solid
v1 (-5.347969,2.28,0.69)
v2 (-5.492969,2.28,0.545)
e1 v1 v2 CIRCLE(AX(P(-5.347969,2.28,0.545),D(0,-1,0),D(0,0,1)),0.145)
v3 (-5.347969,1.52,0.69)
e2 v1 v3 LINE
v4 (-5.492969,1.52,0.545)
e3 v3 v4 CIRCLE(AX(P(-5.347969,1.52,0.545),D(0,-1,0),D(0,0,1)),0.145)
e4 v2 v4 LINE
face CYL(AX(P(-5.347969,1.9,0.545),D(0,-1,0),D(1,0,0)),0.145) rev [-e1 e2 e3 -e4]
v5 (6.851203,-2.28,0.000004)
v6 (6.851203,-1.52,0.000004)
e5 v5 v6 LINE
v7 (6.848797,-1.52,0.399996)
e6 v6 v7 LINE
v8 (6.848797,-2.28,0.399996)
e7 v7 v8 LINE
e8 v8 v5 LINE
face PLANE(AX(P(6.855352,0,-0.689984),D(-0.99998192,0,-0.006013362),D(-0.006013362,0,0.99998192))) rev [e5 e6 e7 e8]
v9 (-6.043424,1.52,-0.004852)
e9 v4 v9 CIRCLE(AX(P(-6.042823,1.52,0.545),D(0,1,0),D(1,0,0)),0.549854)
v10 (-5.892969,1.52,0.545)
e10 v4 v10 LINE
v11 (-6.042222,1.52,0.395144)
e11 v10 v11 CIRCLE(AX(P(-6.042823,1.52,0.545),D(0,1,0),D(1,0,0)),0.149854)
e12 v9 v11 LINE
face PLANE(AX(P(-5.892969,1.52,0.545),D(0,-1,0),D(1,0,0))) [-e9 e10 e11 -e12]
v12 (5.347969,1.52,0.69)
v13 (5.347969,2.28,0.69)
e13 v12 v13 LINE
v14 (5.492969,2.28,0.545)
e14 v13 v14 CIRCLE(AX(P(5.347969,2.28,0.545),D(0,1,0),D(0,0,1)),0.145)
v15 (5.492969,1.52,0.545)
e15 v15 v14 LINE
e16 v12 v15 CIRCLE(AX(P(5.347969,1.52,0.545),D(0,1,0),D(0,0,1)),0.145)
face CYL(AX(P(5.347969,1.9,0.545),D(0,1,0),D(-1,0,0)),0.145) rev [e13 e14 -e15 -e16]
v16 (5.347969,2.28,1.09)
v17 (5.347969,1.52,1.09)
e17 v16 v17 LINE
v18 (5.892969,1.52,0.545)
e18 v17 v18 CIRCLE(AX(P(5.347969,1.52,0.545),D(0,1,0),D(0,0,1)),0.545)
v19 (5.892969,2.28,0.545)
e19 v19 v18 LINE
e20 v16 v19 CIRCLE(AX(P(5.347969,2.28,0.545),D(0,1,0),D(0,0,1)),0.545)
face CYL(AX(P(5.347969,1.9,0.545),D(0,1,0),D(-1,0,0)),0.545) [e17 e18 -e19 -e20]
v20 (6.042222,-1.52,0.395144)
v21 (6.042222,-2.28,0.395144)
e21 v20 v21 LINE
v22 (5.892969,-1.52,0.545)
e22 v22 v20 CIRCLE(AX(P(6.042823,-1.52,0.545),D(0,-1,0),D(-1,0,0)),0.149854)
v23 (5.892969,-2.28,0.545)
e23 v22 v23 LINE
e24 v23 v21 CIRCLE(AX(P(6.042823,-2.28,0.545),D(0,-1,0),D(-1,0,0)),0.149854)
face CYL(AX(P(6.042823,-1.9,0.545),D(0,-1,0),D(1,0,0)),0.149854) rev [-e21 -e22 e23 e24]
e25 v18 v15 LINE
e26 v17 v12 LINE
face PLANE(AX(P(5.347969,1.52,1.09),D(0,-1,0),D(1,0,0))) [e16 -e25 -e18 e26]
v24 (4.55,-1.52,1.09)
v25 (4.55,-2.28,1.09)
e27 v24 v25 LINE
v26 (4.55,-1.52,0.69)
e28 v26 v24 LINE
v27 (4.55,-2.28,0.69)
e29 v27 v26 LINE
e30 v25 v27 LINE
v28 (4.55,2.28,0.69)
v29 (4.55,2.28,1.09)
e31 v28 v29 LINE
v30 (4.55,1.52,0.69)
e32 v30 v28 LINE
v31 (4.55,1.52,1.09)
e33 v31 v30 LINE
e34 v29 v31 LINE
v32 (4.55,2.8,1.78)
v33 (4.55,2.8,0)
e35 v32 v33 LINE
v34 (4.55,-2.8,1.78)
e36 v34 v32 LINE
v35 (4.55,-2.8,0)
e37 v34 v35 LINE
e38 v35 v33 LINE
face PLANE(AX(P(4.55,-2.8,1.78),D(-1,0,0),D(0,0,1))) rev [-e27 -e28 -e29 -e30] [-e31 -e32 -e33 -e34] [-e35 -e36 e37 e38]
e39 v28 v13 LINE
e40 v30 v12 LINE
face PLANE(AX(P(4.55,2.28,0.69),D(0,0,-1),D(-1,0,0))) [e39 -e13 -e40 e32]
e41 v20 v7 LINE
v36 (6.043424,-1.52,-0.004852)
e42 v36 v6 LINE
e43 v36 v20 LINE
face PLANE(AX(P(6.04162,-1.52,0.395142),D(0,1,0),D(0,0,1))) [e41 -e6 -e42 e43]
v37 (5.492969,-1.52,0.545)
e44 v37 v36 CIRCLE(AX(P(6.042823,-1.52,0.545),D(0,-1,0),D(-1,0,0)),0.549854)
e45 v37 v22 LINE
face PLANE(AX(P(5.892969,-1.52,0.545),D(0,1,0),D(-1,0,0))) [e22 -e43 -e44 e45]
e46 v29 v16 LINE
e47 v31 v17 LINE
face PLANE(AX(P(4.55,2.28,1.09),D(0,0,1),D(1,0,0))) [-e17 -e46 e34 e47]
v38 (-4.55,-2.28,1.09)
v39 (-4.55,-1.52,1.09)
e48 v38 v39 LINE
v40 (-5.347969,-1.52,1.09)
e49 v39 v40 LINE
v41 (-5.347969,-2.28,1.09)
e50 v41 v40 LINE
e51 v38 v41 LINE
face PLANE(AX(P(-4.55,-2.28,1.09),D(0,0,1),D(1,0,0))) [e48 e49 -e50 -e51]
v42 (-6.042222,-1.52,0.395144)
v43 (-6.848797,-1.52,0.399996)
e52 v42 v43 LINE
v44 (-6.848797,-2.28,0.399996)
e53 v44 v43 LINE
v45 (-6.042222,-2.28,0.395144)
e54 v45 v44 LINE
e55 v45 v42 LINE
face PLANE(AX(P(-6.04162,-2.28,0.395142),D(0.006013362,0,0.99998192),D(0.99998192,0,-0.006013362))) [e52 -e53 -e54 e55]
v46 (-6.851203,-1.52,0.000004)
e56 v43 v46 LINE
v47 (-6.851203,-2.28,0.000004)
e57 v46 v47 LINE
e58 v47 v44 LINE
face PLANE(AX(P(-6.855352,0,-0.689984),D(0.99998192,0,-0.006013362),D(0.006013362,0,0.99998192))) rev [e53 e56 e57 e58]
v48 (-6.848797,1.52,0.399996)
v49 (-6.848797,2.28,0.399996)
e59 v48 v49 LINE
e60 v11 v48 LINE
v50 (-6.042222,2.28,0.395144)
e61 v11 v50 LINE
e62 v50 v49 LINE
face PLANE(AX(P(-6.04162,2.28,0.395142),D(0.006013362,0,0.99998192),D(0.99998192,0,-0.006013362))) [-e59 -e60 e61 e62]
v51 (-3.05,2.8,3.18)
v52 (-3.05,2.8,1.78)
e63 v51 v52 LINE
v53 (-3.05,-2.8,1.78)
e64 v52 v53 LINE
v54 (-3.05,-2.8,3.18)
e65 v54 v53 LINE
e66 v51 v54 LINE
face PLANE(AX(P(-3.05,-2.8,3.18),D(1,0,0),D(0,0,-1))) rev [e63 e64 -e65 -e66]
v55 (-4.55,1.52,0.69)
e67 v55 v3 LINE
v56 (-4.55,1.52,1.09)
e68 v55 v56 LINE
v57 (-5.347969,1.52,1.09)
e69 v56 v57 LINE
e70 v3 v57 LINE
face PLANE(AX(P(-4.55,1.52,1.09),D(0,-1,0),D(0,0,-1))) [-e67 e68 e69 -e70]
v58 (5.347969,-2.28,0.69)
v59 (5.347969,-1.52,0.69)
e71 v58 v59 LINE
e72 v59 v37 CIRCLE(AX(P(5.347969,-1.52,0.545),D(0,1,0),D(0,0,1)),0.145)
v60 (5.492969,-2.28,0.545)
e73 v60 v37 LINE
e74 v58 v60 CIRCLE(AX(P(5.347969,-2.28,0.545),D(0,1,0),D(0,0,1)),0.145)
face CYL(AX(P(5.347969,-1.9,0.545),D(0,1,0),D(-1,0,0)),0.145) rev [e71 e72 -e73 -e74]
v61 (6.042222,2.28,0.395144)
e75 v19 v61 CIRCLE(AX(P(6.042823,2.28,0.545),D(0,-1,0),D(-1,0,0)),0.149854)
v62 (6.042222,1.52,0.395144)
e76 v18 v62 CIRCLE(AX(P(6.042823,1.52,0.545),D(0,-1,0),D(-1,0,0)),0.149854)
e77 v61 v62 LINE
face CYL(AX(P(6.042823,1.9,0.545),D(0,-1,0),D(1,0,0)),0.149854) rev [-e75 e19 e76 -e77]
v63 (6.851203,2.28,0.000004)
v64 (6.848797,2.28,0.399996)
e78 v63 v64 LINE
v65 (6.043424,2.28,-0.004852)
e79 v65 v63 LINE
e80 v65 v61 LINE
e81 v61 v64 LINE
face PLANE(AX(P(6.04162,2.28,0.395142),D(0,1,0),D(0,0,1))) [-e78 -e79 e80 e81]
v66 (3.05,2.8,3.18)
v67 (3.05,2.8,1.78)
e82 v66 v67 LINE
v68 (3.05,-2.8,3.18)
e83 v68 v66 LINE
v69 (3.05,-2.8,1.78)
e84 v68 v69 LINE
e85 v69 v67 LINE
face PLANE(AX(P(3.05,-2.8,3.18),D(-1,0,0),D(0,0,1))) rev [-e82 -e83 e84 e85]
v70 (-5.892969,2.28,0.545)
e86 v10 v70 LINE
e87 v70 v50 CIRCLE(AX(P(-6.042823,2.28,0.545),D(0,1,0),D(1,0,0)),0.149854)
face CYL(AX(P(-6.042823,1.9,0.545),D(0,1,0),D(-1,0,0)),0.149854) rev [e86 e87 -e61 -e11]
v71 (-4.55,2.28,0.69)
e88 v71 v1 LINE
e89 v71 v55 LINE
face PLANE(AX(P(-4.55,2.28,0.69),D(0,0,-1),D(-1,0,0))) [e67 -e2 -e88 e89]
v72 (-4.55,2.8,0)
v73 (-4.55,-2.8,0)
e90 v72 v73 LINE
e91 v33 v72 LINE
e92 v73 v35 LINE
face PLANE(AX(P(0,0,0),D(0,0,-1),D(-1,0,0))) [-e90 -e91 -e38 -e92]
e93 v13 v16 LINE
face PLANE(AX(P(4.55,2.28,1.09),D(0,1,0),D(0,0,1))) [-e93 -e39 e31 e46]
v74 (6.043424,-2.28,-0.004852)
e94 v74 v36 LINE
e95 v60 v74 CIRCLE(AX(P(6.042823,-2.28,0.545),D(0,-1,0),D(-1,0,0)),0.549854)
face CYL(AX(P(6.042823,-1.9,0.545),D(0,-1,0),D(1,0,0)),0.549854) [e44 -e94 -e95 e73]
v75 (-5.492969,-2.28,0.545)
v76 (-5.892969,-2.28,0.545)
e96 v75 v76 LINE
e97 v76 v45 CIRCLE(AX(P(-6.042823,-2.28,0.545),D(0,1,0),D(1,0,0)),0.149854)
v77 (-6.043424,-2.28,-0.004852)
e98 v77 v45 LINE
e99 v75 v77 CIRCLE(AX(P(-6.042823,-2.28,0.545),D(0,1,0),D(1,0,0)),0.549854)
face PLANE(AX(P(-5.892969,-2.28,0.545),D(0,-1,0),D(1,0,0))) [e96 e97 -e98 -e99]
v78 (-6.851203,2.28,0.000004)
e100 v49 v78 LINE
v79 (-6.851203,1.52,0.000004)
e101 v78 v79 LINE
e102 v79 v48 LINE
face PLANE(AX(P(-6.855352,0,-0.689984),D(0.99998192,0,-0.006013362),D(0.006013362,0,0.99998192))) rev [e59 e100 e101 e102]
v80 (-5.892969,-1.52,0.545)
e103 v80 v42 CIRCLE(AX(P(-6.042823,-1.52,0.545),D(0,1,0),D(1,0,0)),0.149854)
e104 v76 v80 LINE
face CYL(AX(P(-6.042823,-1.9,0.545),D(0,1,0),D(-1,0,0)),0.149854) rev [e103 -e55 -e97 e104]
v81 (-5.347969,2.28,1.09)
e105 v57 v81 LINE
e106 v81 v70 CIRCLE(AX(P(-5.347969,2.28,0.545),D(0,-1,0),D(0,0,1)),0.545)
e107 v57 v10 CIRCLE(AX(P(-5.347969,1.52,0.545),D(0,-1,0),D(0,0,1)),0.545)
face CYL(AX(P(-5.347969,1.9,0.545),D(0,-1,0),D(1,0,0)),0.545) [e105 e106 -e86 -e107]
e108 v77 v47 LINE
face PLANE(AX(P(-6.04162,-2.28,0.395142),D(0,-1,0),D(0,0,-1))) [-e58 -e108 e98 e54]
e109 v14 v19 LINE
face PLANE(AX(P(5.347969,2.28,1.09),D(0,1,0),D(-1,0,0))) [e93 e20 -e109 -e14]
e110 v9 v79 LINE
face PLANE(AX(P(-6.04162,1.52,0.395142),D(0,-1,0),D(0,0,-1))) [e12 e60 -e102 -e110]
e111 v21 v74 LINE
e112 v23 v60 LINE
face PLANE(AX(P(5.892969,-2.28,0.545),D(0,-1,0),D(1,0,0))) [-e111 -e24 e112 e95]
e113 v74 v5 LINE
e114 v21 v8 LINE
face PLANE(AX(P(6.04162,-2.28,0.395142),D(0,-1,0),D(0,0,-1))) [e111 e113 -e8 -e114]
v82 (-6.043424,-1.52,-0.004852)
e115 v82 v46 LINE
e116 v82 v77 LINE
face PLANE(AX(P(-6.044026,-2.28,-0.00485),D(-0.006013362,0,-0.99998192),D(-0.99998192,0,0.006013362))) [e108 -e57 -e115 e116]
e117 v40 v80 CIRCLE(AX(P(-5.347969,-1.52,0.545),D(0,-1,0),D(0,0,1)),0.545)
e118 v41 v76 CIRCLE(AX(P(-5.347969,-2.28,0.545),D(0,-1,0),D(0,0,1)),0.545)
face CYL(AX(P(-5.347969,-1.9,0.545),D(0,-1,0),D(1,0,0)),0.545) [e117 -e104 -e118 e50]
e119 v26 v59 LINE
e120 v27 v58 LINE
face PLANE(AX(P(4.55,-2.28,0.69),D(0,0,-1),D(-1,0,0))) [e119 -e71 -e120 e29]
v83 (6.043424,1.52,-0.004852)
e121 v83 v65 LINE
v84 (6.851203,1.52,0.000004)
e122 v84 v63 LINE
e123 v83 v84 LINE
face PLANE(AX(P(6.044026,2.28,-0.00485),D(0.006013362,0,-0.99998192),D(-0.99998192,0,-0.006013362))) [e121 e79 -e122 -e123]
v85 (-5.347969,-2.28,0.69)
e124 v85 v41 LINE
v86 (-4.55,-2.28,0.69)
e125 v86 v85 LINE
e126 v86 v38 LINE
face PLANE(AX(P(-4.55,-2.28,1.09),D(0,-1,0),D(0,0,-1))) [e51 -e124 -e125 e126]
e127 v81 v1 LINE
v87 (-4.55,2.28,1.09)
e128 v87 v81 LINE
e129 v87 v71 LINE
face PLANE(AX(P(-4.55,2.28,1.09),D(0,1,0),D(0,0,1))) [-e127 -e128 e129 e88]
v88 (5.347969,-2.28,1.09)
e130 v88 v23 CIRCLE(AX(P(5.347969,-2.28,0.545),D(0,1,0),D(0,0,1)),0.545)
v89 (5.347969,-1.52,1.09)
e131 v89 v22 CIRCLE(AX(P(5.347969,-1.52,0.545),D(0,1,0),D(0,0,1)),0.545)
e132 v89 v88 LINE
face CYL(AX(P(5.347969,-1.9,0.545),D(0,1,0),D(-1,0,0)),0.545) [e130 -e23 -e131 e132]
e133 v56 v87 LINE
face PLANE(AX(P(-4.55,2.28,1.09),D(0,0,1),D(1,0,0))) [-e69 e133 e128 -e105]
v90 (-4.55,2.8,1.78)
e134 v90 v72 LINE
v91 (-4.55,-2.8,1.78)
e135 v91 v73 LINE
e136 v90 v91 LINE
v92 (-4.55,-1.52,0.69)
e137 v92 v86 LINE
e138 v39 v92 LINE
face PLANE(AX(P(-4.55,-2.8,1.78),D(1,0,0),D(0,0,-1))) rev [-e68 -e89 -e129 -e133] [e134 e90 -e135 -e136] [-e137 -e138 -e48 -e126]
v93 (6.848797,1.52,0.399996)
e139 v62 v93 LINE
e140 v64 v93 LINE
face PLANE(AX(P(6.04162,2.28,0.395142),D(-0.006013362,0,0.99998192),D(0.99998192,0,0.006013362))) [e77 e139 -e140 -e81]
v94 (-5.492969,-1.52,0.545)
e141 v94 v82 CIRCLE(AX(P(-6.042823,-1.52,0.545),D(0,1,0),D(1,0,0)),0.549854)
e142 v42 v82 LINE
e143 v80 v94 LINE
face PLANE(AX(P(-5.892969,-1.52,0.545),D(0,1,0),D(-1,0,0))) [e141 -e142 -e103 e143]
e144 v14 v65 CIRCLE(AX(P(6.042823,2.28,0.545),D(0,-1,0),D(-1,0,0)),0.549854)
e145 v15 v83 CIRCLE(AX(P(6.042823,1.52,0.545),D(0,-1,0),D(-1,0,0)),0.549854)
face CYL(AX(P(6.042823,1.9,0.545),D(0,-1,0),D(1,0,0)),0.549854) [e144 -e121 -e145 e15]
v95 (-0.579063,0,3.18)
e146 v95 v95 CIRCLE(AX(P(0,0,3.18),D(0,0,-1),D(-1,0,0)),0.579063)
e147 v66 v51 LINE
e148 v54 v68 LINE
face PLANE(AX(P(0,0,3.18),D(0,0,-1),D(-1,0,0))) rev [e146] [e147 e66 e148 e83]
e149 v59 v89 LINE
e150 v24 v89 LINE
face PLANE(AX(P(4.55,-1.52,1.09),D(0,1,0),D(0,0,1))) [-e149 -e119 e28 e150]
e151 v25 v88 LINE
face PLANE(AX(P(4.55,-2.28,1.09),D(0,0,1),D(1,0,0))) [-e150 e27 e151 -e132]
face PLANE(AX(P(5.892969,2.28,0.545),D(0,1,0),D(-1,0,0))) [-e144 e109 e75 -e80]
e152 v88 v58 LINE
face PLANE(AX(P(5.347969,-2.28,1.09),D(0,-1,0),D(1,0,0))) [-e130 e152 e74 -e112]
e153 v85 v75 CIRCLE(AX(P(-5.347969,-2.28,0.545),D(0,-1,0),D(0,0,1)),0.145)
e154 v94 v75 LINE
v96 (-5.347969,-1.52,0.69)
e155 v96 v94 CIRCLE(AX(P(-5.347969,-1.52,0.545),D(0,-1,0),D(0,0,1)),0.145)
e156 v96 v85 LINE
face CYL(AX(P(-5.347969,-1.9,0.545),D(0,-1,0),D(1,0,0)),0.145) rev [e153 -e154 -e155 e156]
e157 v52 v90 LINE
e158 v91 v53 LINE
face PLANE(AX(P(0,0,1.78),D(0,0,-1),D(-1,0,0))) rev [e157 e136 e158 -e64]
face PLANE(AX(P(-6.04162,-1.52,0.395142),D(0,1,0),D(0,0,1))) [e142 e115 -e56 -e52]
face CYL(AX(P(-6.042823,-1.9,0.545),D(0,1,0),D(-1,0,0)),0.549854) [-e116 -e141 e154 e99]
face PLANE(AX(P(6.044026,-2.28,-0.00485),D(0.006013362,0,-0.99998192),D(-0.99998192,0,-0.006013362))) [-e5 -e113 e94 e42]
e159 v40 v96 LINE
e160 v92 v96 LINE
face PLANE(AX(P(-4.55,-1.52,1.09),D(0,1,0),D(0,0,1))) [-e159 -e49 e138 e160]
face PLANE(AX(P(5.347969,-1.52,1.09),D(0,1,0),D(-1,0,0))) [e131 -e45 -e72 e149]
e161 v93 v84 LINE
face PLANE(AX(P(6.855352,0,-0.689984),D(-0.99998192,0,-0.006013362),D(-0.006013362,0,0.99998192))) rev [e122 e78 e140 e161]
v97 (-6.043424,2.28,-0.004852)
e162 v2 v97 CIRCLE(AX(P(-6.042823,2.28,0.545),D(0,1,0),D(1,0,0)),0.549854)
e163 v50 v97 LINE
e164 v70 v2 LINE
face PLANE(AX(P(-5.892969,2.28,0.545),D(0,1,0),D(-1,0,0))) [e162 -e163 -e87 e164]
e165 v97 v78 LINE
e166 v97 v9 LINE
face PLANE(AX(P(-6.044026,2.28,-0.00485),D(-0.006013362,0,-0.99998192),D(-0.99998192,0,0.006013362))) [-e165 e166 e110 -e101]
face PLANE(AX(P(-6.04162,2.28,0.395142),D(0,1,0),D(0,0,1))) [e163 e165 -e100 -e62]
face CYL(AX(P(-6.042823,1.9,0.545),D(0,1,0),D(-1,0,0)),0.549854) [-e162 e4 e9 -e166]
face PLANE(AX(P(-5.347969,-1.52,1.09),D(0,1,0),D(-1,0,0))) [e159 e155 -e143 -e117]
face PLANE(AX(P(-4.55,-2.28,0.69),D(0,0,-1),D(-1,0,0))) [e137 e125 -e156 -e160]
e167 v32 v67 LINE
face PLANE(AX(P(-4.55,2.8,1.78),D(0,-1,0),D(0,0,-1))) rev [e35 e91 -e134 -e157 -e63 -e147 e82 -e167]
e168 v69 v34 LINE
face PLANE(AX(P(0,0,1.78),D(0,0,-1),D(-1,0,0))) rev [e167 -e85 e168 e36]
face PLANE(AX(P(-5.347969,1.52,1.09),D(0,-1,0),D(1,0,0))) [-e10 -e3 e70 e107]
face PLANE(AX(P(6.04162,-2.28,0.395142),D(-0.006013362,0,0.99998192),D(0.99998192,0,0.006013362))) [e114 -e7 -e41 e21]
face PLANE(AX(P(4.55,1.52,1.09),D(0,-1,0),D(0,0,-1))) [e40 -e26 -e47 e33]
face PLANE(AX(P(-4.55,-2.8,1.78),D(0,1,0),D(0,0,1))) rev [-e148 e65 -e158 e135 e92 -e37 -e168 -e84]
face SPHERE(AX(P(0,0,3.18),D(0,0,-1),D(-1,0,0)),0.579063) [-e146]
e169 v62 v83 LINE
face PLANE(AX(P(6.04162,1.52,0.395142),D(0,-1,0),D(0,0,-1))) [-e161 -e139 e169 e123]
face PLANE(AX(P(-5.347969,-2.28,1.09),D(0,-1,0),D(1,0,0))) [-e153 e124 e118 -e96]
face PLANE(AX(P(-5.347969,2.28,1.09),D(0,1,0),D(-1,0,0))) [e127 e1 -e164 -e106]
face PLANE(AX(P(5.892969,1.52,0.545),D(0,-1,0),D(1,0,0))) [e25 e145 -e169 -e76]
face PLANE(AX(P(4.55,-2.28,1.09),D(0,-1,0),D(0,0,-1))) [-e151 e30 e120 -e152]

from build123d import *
from build123d.topology import SkipClean

# Parameters (mm, degrees)
SKETCH_1_W            = 9.1
SKETCH_1_H            = 5.6
EXTRUDE_1_DEPTH       = 1.78
SKETCH_2_W            = 6.1
SKETCH_2_H            = 5.6
EXTRUDE_2_DEPTH       = 1.4
SWEEP_START           = -2.28
SWEEP_2_DEPTH         = 0.76
MIRROR_START          = -2.28
MIRROR_2_COPY_1_DEPTH = 0.76


# Read off the part's stored shape, not the designer's step: 스윕2
with BuildPart() as part:
    # 스케치1 → 보스-돌출1 (new body)
    with BuildSketch(Plane.XY):
        Rectangle(SKETCH_1_W, SKETCH_1_H)
    extrude(amount=EXTRUDE_1_DEPTH)

    # 스케치2 → 보스-돌출2 (add)
    with BuildSketch(Plane.XY.offset(1.78)):
        Rectangle(SKETCH_2_W, SKETCH_2_H)
    extrude(amount=EXTRUDE_2_DEPTH)

    # 스케치3 → 회전1 (revolve)
    with SkipClean():  # the faces are left unmerged after this step: merging them gives an invalid solid
        with BuildSketch(Plane(origin=(0, 0, 0), x_dir=(1, 0, 0), z_dir=(0, 1, 0))):
            with BuildLine():
                Line((-0.579062876, -3.18), (0.579062876, -3.18))
                ThreePointArc((0.579062876, -3.18), (0, -3.759062876), (-0.579062876, -3.18))
            make_face()
        revolve(axis=Axis((-0.579062876, 0, 3.18), (1, 0, 0)))

    # 스윕2 outline → 스윕2 (add)
    with SkipClean():  # the faces are left unmerged after this step: merging them gives an invalid solid
        with BuildSketch(Plane(origin=(0, 0, 0), x_dir=(1, 0, 0), z_dir=(0, 1, 0)).offset(SWEEP_START)):
            with BuildLine():
                Line((6.848797328, -0.399996384), (6.851202672, -3.616e-06))
                Line((6.851202672, -3.616e-06), (6.043424326, 0.004853607))
                ThreePointArc((6.043424326, 0.004853607), (5.654230205, -0.155982007), (5.492969053, -0.545))
                ThreePointArc((5.492969053, -0.545), (5.450499536, -0.647530483), (5.347969053, -0.69))
                Line((5.347969053, -0.69), (4.55, -0.69))
                Line((4.55, -0.69), (4.55, -1.09))
                Line((4.55, -1.09), (5.347969053, -1.09))
                ThreePointArc((5.347969053, -1.09), (5.733342249, -0.930373196), (5.892969053, -0.545))
                ThreePointArc((5.892969053, -0.545), (5.936647868, -0.439250079), (6.042221667, -0.395147271))
                Line((6.042221667, -0.395147271), (6.848797328, -0.399996384))
            make_face()
        sweep_2 = extrude(amount=SWEEP_2_DEPTH)

    # 대칭 복사1: 스윕2 across plane
    with SkipClean():  # the faces are left unmerged after this step: merging them gives an invalid solid
        add(sweep_2.mirror(Plane.ZX))

    # 대칭 복사2: 스윕2 across plane
    with SkipClean():  # the faces are left unmerged after this step: merging them gives an invalid solid
        add(sweep_2.mirror(Plane(origin=(0, 0, 0), x_dir=(0, 0, 1), z_dir=(1, 0, 0))))

    # 대칭 복사2 copy 1 sketch → 대칭 복사2 copy 1 (add)
    with SkipClean():  # the faces are left unmerged after this step: merging them gives an invalid solid
        with BuildSketch(Plane(origin=(0, 0, 0), x_dir=(-1, 0, 0), z_dir=(0, -1, 0)).offset(MIRROR_START)):
            with BuildLine():
                Line((6.848797328, -0.399996384), (6.851202672, -3.616e-06))
                Line((6.851202672, -3.616e-06), (6.043424326, 0.004853607))
                ThreePointArc((6.043424326, 0.004853607), (5.654230205, -0.155982007), (5.492969053, -0.545))
                ThreePointArc((5.492969053, -0.545), (5.450499536, -0.647530483), (5.347969053, -0.69))
                Line((5.347969053, -0.69), (4.55, -0.69))
                Line((4.55, -0.69), (4.55, -1.09))
                Line((4.55, -1.09), (5.347969053, -1.09))
                ThreePointArc((5.347969053, -1.09), (5.733342249, -0.930373196), (5.892969053, -0.545))
                ThreePointArc((5.892969053, -0.545), (5.936647868, -0.439250079), (6.042221667, -0.395147271))
                Line((6.042221667, -0.395147271), (6.848797328, -0.399996384))
            make_face()
        extrude(amount=MIRROR_2_COPY_1_DEPTH)


solid = part.part
